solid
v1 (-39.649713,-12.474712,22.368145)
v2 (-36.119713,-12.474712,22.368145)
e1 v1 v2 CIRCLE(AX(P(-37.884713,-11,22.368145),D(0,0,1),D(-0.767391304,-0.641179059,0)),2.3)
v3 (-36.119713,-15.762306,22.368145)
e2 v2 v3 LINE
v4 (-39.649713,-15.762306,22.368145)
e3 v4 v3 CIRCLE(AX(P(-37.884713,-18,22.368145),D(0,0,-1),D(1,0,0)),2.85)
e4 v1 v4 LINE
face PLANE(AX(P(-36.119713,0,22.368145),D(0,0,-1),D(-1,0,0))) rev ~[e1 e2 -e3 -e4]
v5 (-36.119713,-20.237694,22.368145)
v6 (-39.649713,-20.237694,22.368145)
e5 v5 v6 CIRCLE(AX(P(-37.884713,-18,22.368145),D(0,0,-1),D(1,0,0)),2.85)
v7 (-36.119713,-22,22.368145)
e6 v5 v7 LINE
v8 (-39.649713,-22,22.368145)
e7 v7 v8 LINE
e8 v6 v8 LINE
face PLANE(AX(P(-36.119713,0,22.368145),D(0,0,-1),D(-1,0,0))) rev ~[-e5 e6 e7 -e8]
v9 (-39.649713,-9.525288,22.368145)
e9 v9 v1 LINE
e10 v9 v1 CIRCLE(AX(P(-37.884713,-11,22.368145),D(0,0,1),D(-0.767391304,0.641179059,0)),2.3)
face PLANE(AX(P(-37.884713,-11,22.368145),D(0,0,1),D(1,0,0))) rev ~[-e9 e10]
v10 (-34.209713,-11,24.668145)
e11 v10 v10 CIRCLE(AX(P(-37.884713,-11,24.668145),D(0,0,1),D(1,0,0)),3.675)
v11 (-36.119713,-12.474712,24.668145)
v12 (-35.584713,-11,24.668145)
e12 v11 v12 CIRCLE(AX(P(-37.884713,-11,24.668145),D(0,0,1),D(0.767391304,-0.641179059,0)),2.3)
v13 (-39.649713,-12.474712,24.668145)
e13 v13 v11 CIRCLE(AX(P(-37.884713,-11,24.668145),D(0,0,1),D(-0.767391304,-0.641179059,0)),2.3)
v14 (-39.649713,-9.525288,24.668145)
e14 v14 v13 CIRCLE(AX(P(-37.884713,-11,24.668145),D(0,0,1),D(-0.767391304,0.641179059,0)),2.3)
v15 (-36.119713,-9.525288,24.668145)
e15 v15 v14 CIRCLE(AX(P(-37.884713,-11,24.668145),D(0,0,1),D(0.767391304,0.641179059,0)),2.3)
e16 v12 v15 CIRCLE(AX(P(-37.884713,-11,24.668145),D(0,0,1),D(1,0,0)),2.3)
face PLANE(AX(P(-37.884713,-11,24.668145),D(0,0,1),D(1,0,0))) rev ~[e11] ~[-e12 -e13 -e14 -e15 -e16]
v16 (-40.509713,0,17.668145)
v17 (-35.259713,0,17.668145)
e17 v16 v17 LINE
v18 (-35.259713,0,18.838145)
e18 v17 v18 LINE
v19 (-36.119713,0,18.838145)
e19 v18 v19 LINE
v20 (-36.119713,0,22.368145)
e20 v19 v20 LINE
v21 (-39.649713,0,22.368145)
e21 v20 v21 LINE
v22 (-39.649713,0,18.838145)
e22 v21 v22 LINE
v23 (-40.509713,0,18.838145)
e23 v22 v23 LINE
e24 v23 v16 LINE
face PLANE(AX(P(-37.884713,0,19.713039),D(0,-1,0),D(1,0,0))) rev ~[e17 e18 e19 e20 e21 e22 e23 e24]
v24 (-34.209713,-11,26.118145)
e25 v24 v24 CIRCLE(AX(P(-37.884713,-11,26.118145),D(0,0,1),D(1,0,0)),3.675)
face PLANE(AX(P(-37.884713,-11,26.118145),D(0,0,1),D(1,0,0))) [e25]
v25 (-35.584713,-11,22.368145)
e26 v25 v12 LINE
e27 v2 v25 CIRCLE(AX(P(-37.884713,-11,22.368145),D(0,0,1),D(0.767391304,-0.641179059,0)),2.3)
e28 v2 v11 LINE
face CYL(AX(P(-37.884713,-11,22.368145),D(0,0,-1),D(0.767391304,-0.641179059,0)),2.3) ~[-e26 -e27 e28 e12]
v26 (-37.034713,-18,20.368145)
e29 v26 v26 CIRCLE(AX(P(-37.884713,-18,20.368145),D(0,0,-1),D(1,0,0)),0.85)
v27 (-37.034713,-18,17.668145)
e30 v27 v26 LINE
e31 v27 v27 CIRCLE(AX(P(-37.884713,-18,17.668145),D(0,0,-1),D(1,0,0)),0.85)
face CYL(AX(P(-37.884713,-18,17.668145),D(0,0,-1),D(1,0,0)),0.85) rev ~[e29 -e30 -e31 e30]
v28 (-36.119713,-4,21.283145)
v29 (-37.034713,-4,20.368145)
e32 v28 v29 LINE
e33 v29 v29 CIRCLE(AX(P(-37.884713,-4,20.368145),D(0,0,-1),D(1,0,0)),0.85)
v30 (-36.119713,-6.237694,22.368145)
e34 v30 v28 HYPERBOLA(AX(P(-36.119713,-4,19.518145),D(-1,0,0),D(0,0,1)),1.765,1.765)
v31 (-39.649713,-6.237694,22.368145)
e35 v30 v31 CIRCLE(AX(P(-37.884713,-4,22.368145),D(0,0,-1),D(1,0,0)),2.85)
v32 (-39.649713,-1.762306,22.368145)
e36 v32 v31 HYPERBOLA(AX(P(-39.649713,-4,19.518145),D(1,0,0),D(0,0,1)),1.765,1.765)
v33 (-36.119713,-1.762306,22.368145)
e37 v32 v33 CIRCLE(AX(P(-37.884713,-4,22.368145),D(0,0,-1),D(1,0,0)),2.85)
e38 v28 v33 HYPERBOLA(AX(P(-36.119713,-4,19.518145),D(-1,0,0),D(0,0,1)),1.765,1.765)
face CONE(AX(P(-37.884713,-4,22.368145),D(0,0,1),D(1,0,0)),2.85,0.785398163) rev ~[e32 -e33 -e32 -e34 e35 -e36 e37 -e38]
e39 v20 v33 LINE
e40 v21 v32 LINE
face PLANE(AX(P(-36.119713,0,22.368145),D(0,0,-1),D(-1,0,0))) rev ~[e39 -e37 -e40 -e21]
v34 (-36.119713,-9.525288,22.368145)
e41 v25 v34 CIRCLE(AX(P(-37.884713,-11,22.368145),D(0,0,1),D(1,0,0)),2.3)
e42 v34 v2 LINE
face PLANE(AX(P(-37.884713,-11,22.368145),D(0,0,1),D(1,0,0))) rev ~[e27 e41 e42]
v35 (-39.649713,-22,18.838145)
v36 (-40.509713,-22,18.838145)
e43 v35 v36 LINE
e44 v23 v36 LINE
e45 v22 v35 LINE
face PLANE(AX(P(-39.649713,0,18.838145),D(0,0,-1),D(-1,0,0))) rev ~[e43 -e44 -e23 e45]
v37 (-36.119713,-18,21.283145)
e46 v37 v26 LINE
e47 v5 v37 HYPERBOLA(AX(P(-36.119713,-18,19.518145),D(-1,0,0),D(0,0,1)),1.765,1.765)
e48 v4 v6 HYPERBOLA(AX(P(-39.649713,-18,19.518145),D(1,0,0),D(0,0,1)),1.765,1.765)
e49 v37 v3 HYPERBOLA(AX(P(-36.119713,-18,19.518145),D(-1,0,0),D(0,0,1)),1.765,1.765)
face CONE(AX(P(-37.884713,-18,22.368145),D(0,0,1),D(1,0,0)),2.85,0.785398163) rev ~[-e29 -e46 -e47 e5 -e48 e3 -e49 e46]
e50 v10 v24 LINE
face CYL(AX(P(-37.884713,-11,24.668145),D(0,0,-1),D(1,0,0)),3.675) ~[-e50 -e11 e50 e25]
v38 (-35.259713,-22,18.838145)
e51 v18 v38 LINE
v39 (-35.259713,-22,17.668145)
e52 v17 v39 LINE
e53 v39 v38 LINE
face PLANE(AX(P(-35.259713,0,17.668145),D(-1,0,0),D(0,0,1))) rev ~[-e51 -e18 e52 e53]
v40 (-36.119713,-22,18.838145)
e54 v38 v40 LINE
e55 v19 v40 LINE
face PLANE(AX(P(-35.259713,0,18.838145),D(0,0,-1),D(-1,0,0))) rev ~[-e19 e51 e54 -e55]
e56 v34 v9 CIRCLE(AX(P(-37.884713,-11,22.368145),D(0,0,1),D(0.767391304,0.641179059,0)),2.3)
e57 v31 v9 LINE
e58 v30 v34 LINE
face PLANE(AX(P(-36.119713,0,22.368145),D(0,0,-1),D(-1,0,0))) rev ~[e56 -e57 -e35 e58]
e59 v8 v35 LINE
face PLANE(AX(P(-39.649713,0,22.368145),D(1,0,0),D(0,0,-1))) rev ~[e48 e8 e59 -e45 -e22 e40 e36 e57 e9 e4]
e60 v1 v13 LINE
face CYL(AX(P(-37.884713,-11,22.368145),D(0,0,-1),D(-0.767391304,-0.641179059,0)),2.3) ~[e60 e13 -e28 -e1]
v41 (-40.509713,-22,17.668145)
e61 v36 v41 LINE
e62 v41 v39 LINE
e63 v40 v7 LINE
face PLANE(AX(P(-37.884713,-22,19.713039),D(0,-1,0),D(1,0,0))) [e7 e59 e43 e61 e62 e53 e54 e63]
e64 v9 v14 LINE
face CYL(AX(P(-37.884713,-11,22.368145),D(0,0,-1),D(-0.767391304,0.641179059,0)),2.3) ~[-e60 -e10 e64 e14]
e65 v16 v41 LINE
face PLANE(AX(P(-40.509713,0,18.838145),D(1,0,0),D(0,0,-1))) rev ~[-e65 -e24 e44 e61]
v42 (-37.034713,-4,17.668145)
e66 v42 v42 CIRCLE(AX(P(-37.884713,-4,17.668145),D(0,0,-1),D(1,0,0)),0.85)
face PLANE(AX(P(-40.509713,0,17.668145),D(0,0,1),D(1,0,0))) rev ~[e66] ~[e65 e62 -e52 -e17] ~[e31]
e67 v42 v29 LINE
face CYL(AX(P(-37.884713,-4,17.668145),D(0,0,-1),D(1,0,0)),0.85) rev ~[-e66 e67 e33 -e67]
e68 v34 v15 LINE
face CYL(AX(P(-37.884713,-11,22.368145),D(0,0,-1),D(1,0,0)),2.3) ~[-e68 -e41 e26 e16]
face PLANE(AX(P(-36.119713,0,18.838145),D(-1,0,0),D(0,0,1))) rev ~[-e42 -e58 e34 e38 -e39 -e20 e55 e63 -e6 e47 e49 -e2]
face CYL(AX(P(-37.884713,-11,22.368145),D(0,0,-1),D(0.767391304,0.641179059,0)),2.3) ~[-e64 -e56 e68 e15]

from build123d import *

# Parameters (mm, degrees)
F1_DEPTH = 22
F3_DEPTH = 2.3
F4_R     = 3.675
F4_R_2   = 2.3
F5_DEPTH = 1.45
F6_R     = 0.85
F7_DEPTH = 25


# Not quite as in the source:
# - a fillet or chamfer that OpenCascade refuses, or shapes differently, is made with other operations: its cross-section is extruded or revolved along the edge and cut away or added


with BuildPart() as f1:
    # F0 (on Front) → F1 (new body)
    with BuildSketch(Plane.XZ):
        Polygon((-36.1197131506, 22.3681449045), (-39.6497131506, 22.3681449045), (-39.6497131506, 18.8381449045), (-40.5097131506, 18.8381449045), (-40.5097131506, 17.6681449045), (-39.6497131506, 17.6681449045), (-36.1197131506, 17.6681449045), (-35.2597131506, 17.6681449045), (-35.2597131506, 18.8381449045), (-36.1197131506, 18.8381449045), align=None)
    extrude(amount=F1_DEPTH)

    # F2 (on face) → F3 (join)
    with BuildSketch(Plane.XY.offset(22.3681449045)):
        with BuildLine():
            Line((-36.1197131506, -12.4747118363), (-36.1197131506, -9.5252881637))
            ThreePointArc((-36.1197131506, -9.5252881637), (-37.8847131506, -8.7), (-39.6497131506, -9.5252881637))
            Line((-39.6497131506, -9.5252881637), (-39.6497131506, -12.4747118363))
            ThreePointArc((-39.6497131506, -12.4747118363), (-37.8847131506, -13.3), (-36.1197131506, -12.4747118363))
        make_face()
        with BuildLine():
            Line((-39.6497131506, -12.4747118363), (-39.6497131506, -9.5252881637))
            ThreePointArc((-39.6497131506, -9.5252881637), (-40.1847131506, -11), (-39.6497131506, -12.4747118363))
        make_face()
        with BuildLine():
            ThreePointArc((-36.1197131506, -12.4747118363), (-35.7225961325, -11.7843787351), (-35.5847131506, -11))
            ThreePointArc((-35.5847131506, -11), (-35.7225961325, -10.2156212649), (-36.1197131506, -9.5252881637))
            Line((-36.1197131506, -9.5252881637), (-36.1197131506, -12.4747118363))
        make_face()
    extrude(amount=F3_DEPTH)

    # F4 (on face) → F5 (join)
    with BuildSketch(Plane.XY.offset(24.6681449045)):
        with Locations((-37.8847131506, -11)):
            Circle(F4_R)
        with Locations((-37.8847131506, -11)):
            Circle(F4_R_2, mode=Mode.SUBTRACT)
        with Locations((-37.8847131506, -11)):
            Circle(F4_R_2)
    extrude(amount=F5_DEPTH)

    # F6 (on face) → F7 (cut)
    with BuildSketch(Plane(origin=(0, 0, 17.6681449045), x_dir=(1, 0, 0), z_dir=(0, 0, -1))):
        with Locations((-37.8847131506, 18)):
            Circle(F6_R)
        with Locations((-37.8847131506, 4)):
            Circle(F6_R)
    extrude(amount=-F7_DEPTH, mode=Mode.SUBTRACT)

    # F8: chamfer of 2 on 1 edges, made by hand

    # F8_s1 → F8_t2 (revolve, cut)
    with BuildSketch(Plane.XZ.offset(18)):
        Polygon((-35.0347131506, 22.3681449045), (-37.0347131506, 20.3681449045), (-37.0347131506, 22.3681449045), align=None)
    revolve(axis=Axis((-37.8847131506, -18, 22.3681449045), (0, 0, -1)), mode=Mode.SUBTRACT)

    # F9: chamfer of 2 on 1 edges, made by hand

    # F9_s1 → F9_t2 (revolve, cut)
    with BuildSketch(Plane.XZ.offset(4)):
        Polygon((-35.0347131506, 22.3681449045), (-37.0347131506, 20.3681449045), (-37.0347131506, 22.3681449045), align=None)
    revolve(axis=Axis((-37.8847131506, -4, 22.3681449045), (0, 0, -1)), mode=Mode.SUBTRACT)


solid = f1.part
